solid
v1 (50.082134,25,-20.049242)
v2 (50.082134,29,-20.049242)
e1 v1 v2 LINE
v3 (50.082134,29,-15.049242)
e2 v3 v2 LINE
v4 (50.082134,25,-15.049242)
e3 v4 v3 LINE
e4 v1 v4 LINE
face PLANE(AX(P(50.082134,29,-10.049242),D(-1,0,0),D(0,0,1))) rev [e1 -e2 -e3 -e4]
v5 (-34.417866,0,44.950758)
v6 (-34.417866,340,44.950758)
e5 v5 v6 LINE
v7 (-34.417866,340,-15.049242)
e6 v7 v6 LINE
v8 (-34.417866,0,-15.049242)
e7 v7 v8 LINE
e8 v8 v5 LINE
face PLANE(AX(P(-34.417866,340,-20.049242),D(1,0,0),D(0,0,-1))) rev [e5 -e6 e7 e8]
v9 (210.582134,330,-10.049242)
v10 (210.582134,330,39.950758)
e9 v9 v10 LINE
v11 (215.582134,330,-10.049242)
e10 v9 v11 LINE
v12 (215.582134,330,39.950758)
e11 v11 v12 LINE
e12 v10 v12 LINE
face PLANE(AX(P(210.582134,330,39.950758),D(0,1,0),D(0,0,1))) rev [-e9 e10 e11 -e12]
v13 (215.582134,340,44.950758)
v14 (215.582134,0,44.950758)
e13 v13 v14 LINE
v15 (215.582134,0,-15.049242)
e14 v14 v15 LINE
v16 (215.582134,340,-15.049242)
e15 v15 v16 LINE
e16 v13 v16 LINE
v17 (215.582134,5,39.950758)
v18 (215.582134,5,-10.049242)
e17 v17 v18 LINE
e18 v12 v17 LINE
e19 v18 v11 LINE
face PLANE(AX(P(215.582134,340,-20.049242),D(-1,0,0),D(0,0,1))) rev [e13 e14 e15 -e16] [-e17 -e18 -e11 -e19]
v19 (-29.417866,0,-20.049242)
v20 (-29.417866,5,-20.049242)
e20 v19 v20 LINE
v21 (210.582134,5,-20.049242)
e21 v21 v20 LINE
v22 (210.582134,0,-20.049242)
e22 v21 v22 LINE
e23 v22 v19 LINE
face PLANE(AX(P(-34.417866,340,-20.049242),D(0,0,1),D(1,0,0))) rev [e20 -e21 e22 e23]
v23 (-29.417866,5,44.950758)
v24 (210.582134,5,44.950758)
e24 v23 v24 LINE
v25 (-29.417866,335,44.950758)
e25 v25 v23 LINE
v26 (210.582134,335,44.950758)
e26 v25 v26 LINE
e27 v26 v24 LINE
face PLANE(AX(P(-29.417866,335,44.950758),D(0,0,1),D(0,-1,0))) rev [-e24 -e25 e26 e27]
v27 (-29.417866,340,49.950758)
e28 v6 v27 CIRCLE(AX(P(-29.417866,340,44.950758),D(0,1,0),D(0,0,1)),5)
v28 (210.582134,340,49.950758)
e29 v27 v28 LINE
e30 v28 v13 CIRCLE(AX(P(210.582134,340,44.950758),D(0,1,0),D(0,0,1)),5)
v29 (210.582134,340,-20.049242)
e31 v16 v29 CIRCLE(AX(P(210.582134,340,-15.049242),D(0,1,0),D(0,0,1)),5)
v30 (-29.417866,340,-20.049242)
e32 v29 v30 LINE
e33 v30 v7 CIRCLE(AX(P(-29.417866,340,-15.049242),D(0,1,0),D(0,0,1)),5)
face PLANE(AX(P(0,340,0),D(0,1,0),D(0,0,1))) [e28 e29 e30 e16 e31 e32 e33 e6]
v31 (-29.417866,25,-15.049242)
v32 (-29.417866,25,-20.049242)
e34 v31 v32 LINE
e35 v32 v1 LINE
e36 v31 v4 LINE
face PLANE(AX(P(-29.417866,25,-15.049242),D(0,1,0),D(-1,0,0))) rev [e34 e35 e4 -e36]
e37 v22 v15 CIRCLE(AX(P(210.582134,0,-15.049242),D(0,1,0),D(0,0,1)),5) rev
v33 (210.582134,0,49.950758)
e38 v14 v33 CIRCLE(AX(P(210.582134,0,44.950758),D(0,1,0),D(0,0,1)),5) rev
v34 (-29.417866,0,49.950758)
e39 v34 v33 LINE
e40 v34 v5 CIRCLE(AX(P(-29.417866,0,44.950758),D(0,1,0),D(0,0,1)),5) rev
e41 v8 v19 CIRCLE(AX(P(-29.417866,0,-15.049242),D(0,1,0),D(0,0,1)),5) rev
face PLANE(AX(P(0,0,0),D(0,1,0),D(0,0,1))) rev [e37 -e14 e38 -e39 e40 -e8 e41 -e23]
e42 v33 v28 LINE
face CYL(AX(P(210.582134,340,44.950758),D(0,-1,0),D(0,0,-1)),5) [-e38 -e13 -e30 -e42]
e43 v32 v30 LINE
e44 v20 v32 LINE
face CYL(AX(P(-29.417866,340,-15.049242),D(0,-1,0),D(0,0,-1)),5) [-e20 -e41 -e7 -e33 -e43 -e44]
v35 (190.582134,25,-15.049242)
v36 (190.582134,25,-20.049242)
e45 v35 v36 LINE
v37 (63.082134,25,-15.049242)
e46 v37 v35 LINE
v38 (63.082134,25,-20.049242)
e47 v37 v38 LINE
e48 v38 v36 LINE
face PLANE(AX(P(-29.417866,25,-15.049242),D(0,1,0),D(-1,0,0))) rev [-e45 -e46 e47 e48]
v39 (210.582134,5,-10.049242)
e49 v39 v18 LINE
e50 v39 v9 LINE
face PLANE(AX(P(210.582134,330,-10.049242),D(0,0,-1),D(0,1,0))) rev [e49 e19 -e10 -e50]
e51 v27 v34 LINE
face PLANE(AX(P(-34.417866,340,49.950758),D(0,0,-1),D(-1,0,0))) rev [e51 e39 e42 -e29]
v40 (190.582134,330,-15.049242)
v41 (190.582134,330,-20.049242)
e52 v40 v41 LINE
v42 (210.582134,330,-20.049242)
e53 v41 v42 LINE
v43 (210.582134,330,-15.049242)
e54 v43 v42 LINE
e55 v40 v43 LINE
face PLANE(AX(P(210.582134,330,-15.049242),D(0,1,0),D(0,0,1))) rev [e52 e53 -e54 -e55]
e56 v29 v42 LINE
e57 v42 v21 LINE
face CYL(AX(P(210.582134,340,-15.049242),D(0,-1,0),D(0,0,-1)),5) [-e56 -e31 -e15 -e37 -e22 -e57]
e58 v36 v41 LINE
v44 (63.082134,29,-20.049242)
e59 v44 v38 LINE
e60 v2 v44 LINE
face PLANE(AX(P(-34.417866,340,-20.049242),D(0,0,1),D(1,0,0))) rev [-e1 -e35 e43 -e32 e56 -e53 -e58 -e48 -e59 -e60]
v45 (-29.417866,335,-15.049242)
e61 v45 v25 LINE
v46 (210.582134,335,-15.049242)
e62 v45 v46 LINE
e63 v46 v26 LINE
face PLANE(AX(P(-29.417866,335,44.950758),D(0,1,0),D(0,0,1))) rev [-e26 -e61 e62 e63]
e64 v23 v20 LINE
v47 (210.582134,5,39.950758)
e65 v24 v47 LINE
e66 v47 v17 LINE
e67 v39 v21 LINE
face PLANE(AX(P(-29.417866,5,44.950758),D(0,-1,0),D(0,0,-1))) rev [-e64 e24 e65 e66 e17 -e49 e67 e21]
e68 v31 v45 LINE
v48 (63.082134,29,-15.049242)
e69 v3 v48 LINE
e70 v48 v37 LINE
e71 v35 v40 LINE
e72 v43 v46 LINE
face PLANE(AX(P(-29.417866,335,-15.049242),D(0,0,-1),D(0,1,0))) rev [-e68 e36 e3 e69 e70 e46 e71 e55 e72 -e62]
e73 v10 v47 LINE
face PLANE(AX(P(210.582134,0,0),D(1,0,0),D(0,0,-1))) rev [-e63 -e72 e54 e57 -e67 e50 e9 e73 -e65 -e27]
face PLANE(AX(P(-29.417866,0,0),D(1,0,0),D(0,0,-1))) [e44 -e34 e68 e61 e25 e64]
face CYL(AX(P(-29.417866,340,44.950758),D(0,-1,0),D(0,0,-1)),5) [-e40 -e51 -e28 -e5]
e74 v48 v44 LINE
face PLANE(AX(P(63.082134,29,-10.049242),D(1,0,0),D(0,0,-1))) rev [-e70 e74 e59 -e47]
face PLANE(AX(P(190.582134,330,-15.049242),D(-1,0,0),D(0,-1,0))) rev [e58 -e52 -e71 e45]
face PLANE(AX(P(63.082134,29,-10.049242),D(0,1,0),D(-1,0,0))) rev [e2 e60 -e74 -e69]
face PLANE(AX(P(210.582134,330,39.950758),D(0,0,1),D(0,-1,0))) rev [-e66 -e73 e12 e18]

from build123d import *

# Parameters (mm, degrees)
SKETCH_2_W          = 250
SKETCH_2_H          = 70
EXTRUDE_1_DEPTH     = 340
CUT_EXTRUDE_START   = -5
SKETCH_3_W          = 60
SKETCH_3_H          = 330
CUT_EXTRUDE_1_DEPTH = 240
SKETCH_4_W          = 50
SKETCH_4_H          = 325
CUT_EXTRUDE_2_DEPTH = 5
CUT_EXTRUDE_3_DEPTH = 5
FILLET_START        = -1
FILLET_1_DEPTH      = 342
SKETCH_6_W          = 13
SKETCH_6_H          = 4
CUT_EXTRUDE_4_DEPTH = 10


with BuildPart() as part:
    # 草圖2 → 填料-伸長1 (new body)
    with BuildSketch(Plane(origin=(0, 0, 0), x_dir=(1, 0, 0), z_dir=(0, 1, 0))):
        with Locations((90.582134355, -14.950757877)):
            Rectangle(SKETCH_2_W, SKETCH_2_H)
    extrude(amount=EXTRUDE_1_DEPTH)

    # 草圖3 → 除料-伸長1 (cut)
    with BuildSketch(Plane(origin=(215.582134355, 0, 0), x_dir=(0, 0, -1), z_dir=(1, 0, 0)).offset(CUT_EXTRUDE_START)):
        with Locations((-14.950757877, 170)):
            Rectangle(SKETCH_3_W, SKETCH_3_H)
    extrude(amount=-CUT_EXTRUDE_1_DEPTH, mode=Mode.SUBTRACT)

    # 草圖4 → 除料-伸長2 (cut)
    with BuildSketch(Plane(origin=(215.582134355, 0, 0), x_dir=(0, 0, -1), z_dir=(1, 0, 0))):
        with Locations((-14.950757877, 167.5)):
            Rectangle(SKETCH_4_W, SKETCH_4_H)
    extrude(amount=-CUT_EXTRUDE_2_DEPTH, mode=Mode.SUBTRACT)

    # 草圖5 → 除料-伸長3 (cut)
    with BuildSketch(Plane(origin=(0, 0, -20.049242123), x_dir=(-1, 0, 0), z_dir=(0, 0, -1))):
        Polygon((-210.582134355, 330), (-190.582134355, 330), (-190.582134355, 25), (29.417865645, 25), (29.417865645, 5), (-210.582134355, 5), align=None)
    extrude(amount=-CUT_EXTRUDE_3_DEPTH, mode=Mode.SUBTRACT)

    # 圓角1: read off the stored shape, not the designer's step
    # 圓角1 outline → 圓角1 (cut)
    with BuildSketch(Plane(origin=(0, 0, 0), x_dir=(1, 0, 0), z_dir=(0, 1, 0)).offset(FILLET_START)):
        with BuildLine():
            Line((215.582134355, 20.049242123), (210.582134355, 20.049242123))
            ThreePointArc((210.582134355, 20.049242123), (214.117668261, 18.584776029), (215.582134355, 15.049242123))
            Line((215.582134355, 15.049242123), (215.582134355, 20.049242123))
        make_face()
        with BuildLine():
            ThreePointArc((-34.417865645, 15.049242123), (-32.953399551, 18.584776029), (-29.417865645, 20.049242123))
            Line((-29.417865645, 20.049242123), (-34.417865645, 20.049242123))
            Line((-34.417865645, 20.049242123), (-34.417865645, 15.049242123))
        make_face()
        with BuildLine():
            Line((215.582134355, -49.950757877), (215.582134355, -44.950757877))
            ThreePointArc((215.582134355, -44.950757877), (214.117668261, -48.486291783), (210.582134355, -49.950757877))
            Line((210.582134355, -49.950757877), (215.582134355, -49.950757877))
        make_face()
        with BuildLine():
            ThreePointArc((-29.417865645, -49.950757877), (-32.953399551, -48.486291783), (-34.417865645, -44.950757877))
            Line((-34.417865645, -44.950757877), (-34.417865645, -49.950757877))
            Line((-34.417865645, -49.950757877), (-29.417865645, -49.950757877))
        make_face()
    extrude(amount=FILLET_1_DEPTH, mode=Mode.SUBTRACT)

    # 草圖6 → 除料-伸長4 (cut)
    with BuildSketch(Plane(origin=(0, 0, -20.049242123), x_dir=(-1, 0, 0), z_dir=(0, 0, -1))):
        with Locations((-56.582134355, 27)):
            Rectangle(SKETCH_6_W, SKETCH_6_H)
    extrude(amount=-CUT_EXTRUDE_4_DEPTH, mode=Mode.SUBTRACT)


solid = part.part
